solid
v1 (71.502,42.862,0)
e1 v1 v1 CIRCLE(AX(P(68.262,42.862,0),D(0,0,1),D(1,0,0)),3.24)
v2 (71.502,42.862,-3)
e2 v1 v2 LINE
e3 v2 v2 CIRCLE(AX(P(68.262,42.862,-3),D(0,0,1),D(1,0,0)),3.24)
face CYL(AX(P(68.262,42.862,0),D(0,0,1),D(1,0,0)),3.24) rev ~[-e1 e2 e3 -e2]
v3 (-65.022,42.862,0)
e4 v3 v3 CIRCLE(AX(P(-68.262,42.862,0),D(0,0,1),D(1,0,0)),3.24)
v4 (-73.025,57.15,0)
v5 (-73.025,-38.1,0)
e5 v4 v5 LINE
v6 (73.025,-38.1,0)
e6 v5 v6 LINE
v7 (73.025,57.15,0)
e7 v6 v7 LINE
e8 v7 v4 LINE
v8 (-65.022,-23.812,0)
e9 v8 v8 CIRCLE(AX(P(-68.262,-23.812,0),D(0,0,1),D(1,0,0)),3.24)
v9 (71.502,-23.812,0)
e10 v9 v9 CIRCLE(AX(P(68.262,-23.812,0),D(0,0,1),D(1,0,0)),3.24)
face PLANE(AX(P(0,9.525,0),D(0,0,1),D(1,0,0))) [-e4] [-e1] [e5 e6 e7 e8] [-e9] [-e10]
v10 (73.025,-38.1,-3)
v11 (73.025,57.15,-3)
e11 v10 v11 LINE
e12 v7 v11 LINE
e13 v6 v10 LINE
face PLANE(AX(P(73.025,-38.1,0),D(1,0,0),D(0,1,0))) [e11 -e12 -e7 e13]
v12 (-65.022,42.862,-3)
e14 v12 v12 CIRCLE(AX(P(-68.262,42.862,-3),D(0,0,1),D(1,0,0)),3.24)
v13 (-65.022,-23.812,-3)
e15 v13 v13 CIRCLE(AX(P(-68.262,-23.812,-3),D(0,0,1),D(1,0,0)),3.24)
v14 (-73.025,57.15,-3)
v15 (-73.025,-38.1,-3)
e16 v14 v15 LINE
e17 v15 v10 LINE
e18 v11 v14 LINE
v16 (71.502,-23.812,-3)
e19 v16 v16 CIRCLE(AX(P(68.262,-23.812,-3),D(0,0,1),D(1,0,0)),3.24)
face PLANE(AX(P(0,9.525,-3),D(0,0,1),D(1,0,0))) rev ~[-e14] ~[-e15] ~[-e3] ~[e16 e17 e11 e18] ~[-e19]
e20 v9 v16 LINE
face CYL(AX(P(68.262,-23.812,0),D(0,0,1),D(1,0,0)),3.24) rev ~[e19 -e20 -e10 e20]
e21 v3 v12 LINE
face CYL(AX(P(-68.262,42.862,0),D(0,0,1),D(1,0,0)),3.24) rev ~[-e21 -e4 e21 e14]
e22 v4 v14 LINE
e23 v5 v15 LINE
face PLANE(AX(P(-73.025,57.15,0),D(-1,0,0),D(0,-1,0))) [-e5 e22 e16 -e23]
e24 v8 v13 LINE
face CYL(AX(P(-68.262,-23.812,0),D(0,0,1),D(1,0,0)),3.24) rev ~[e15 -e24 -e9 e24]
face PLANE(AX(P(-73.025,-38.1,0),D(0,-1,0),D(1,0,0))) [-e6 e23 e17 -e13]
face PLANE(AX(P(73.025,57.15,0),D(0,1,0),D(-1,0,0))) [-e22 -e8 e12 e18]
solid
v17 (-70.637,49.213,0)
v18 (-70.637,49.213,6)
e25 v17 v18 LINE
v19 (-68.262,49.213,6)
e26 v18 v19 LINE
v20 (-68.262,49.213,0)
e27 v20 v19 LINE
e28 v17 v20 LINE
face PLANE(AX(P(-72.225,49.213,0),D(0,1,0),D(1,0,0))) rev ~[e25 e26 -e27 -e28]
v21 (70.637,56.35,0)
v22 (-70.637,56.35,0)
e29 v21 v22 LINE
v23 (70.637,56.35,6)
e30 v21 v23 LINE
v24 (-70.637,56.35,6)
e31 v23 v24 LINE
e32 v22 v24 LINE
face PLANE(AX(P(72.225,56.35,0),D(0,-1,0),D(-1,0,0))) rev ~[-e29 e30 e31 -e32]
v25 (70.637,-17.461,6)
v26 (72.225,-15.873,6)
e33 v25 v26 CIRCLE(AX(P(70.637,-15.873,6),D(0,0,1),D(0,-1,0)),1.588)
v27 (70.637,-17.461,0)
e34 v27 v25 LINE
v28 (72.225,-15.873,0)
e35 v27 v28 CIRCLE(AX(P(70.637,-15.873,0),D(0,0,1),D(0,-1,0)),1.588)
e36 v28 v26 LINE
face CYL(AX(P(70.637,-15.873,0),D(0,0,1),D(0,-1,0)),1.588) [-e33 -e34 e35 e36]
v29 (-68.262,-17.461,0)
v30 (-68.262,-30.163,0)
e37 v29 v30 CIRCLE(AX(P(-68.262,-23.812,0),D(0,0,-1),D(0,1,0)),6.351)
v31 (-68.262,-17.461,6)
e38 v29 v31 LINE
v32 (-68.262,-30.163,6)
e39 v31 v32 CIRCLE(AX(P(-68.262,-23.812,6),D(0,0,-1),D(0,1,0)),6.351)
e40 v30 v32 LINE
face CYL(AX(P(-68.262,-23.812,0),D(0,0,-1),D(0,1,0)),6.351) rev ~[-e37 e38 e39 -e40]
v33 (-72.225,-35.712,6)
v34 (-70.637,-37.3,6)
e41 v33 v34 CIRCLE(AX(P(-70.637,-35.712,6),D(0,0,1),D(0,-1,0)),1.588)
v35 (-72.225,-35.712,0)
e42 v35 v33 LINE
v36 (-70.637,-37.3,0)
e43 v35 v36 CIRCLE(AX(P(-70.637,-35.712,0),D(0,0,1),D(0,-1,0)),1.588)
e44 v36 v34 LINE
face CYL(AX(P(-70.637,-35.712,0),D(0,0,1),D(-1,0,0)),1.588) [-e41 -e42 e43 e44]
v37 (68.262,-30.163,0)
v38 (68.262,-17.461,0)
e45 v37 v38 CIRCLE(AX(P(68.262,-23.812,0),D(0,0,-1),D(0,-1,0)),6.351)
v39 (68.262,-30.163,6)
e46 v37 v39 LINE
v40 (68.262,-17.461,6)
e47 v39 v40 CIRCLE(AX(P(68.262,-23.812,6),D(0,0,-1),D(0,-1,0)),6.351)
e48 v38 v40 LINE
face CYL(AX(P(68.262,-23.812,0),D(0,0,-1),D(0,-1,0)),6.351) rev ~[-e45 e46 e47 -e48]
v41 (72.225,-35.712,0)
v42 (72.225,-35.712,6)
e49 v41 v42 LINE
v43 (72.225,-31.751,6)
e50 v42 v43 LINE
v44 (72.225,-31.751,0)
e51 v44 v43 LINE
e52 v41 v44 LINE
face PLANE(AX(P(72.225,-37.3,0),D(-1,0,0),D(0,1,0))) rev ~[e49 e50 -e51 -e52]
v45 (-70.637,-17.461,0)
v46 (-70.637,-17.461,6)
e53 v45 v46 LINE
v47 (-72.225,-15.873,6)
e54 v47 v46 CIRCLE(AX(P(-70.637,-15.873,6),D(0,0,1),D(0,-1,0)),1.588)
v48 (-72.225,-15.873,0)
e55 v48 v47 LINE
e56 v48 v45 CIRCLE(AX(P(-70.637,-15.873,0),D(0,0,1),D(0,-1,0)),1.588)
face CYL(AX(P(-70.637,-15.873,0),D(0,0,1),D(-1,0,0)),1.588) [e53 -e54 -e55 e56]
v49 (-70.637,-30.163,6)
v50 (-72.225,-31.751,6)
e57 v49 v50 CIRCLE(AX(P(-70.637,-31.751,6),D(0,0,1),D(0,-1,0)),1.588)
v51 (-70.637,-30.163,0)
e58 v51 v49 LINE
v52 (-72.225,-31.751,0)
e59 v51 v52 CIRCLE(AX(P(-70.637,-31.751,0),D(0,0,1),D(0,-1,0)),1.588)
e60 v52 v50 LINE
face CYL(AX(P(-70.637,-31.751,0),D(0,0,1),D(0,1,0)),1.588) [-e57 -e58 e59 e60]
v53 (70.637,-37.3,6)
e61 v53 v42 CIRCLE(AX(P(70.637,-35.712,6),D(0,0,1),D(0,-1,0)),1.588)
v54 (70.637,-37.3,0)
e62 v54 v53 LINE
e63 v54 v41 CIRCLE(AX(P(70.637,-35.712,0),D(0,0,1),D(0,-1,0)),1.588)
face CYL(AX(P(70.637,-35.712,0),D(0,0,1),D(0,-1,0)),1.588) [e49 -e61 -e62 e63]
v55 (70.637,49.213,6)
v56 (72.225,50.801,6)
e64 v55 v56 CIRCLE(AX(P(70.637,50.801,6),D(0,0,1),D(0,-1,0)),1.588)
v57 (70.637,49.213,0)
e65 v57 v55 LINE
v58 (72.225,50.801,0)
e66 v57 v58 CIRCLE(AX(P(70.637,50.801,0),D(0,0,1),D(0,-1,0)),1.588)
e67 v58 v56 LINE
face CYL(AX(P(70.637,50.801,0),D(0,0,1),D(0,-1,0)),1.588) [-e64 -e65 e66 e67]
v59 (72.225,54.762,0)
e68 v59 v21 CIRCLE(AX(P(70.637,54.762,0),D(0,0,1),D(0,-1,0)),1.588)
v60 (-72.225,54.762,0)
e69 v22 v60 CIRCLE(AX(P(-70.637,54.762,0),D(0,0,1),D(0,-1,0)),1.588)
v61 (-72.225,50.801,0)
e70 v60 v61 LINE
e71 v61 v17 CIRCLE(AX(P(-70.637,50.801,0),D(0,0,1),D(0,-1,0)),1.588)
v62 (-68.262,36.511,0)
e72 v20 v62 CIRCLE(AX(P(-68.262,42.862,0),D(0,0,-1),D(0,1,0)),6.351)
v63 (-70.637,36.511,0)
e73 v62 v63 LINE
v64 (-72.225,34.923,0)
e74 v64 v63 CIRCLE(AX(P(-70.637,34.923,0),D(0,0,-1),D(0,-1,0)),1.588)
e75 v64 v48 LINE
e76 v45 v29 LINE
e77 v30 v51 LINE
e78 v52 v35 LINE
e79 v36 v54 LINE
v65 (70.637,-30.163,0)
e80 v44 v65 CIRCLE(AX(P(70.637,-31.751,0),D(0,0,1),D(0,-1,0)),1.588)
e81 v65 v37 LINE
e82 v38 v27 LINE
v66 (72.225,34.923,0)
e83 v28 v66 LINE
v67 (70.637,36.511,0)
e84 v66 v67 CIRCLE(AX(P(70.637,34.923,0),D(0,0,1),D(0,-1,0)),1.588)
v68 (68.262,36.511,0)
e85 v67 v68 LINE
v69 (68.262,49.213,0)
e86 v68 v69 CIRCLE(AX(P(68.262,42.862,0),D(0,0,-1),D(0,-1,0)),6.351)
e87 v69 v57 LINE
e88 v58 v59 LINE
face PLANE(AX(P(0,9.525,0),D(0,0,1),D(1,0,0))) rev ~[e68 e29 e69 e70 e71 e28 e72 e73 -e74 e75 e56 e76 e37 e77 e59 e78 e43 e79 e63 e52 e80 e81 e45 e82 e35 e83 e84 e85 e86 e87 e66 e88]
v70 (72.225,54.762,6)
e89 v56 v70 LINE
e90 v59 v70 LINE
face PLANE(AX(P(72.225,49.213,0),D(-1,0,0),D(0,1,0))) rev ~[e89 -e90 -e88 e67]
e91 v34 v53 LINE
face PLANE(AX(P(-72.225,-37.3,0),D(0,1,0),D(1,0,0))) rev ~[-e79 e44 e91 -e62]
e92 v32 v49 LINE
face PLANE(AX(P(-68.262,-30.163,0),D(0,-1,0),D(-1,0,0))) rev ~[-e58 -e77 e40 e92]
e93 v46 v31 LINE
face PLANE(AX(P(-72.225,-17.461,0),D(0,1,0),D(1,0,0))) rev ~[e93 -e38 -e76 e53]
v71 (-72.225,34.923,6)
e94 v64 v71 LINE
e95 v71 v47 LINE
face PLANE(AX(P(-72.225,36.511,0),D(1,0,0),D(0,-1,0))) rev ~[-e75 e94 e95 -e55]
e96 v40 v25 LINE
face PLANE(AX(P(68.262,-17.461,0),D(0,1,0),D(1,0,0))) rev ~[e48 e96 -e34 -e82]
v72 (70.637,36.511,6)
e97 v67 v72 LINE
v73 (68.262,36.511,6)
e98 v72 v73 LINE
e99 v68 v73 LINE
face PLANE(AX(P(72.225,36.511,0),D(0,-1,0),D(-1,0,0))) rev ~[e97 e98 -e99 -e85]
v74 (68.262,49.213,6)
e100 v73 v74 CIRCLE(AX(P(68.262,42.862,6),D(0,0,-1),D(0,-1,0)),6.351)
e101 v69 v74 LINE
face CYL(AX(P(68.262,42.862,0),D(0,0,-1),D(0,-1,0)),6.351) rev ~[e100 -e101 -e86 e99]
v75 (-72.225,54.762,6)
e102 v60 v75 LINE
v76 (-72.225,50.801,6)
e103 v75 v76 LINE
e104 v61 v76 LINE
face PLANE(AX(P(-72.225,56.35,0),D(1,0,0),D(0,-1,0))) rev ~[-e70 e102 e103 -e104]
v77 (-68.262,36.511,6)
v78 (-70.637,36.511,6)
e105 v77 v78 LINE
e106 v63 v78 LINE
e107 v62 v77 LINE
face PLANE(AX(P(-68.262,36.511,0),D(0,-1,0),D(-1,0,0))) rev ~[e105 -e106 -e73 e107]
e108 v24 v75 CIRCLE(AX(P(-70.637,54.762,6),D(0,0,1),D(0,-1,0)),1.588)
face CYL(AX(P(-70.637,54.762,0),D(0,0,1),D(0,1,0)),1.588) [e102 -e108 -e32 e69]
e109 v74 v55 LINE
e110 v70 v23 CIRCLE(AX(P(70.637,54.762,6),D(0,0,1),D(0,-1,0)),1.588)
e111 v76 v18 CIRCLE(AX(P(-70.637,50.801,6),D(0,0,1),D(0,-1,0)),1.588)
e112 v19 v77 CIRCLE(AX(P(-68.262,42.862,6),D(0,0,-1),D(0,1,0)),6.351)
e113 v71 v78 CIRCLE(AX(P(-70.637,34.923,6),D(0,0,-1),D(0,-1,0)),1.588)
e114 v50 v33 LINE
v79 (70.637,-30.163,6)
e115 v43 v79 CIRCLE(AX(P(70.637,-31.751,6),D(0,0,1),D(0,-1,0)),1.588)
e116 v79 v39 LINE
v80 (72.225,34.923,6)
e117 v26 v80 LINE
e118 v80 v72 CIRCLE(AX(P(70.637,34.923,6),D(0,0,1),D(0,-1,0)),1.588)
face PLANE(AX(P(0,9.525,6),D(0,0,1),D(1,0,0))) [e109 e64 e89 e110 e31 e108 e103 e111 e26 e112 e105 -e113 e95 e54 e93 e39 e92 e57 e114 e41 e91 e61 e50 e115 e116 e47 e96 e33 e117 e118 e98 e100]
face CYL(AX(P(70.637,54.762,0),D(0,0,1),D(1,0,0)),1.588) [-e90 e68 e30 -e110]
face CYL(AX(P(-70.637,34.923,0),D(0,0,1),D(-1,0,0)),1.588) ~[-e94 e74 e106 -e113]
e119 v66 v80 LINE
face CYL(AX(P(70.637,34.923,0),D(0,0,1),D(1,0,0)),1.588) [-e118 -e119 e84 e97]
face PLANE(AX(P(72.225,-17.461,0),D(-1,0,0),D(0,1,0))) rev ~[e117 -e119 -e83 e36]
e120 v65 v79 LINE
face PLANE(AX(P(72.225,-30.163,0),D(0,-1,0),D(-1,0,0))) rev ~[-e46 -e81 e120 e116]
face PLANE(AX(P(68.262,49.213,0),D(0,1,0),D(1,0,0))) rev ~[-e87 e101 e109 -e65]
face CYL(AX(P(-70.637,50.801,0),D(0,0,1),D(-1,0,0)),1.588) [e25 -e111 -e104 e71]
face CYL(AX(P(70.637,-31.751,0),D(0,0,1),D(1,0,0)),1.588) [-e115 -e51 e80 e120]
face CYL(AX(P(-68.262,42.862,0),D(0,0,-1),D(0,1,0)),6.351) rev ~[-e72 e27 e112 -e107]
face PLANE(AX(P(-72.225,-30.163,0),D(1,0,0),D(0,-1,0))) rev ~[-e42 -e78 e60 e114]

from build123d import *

# Parameters (mm, degrees)
F0_R     = 3.24
F1_DEPTH = 3
F2_DEPTH = 6
F3_R     = 1.588


# Not quite as in the source:
# - a feature names something its author has since deleted; it is built from what else it names


with BuildPart() as f1:
    # F0 (on Top) → F1 (new body)
    with BuildSketch(Plane.XY):
        Polygon((0, 57.15), (-73.025, 57.15), (-73.025, 9.525), (-73.025, -38.1), (73.025, -38.1), (73.025, 57.15), align=None)
        with Locations((-68.262, -23.812)):
            Circle(F0_R, mode=Mode.SUBTRACT)
        with Locations((68.262, -23.812)):
            Circle(F0_R, mode=Mode.SUBTRACT)
        with Locations((-68.262, 42.862)):
            Circle(F0_R, mode=Mode.SUBTRACT)
        with BuildLine():
            Line((-72.225, -17.461), (-72.225, 9.525))
            Line((-72.225, 9.525), (-72.225, 36.511))
            Line((-72.225, 36.511), (-68.262, 36.511))
            ThreePointArc((-68.262, 36.511), (-61.911, 42.862), (-68.262, 49.213))
            Line((-68.262, 49.213), (-72.225, 49.213))
            Line((-72.225, 49.213), (-72.225, 56.35))
            Line((-72.225, 56.35), (72.225, 56.35))
            Line((72.225, 56.35), (72.225, 49.213))
            Line((72.225, 49.213), (68.262, 49.213))
            ThreePointArc((68.262, 49.213), (61.911, 42.862), (68.262, 36.511))
            Line((68.262, 36.511), (72.225, 36.511))
            Line((72.225, 36.511), (72.225, -17.461))
            Line((72.225, -17.461), (68.262, -17.461))
            ThreePointArc((68.262, -17.461), (61.911, -23.812), (68.262, -30.163))
            Line((68.262, -30.163), (72.225, -30.163))
            Line((72.225, -30.163), (72.225, -37.3))
            Line((72.225, -37.3), (-72.225, -37.3))
            Line((-72.225, -37.3), (-72.225, -30.163))
            Line((-72.225, -30.163), (-68.262, -30.163))
            ThreePointArc((-68.262, -30.163), (-61.911, -23.812), (-68.262, -17.461))
            Line((-68.262, -17.461), (-72.225, -17.461))
        make_face(mode=Mode.SUBTRACT)
        with Locations((68.262, 42.862)):
            Circle(F0_R, mode=Mode.SUBTRACT)
        with BuildLine():
            Line((-72.225, 36.511), (-72.225, 9.525))
            Line((-72.225, 9.525), (-72.225, -17.461))
            Line((-72.225, -17.461), (-68.262, -17.461))
            ThreePointArc((-68.262, -17.461), (-61.911, -23.812), (-68.262, -30.163))
            Line((-68.262, -30.163), (-72.225, -30.163))
            Line((-72.225, -30.163), (-72.225, -37.3))
            Line((-72.225, -37.3), (72.225, -37.3))
            Line((72.225, -37.3), (72.225, -30.163))
            Line((72.225, -30.163), (68.262, -30.163))
            ThreePointArc((68.262, -30.163), (61.911, -23.812), (68.262, -17.461))
            Line((68.262, -17.461), (72.225, -17.461))
            Line((72.225, -17.461), (72.225, 36.511))
            Line((72.225, 36.511), (68.262, 36.511))
            ThreePointArc((68.262, 36.511), (61.911, 42.862), (68.262, 49.213))
            Line((68.262, 49.213), (72.225, 49.213))
            Line((72.225, 49.213), (72.225, 56.35))
            Line((72.225, 56.35), (-72.225, 56.35))
            Line((-72.225, 56.35), (-72.225, 49.213))
            Line((-72.225, 49.213), (-68.262, 49.213))
            ThreePointArc((-68.262, 49.213), (-61.911, 42.862), (-68.262, 36.511))
            Line((-68.262, 36.511), (-72.225, 36.511))
        make_face()
    extrude(amount=-F1_DEPTH)


with BuildPart() as f2:
    # F0 (on Top) → F2 (new body)
    with BuildSketch(Plane.XY):
        with BuildLine():
            Line((-72.225, 36.511), (-72.225, 9.525))
            Line((-72.225, 9.525), (-72.225, -17.461))
            Line((-72.225, -17.461), (-68.262, -17.461))
            ThreePointArc((-68.262, -17.461), (-61.911, -23.812), (-68.262, -30.163))
            Line((-68.262, -30.163), (-72.225, -30.163))
            Line((-72.225, -30.163), (-72.225, -37.3))
            Line((-72.225, -37.3), (72.225, -37.3))
            Line((72.225, -37.3), (72.225, -30.163))
            Line((72.225, -30.163), (68.262, -30.163))
            ThreePointArc((68.262, -30.163), (61.911, -23.812), (68.262, -17.461))
            Line((68.262, -17.461), (72.225, -17.461))
            Line((72.225, -17.461), (72.225, 36.511))
            Line((72.225, 36.511), (68.262, 36.511))
            ThreePointArc((68.262, 36.511), (61.911, 42.862), (68.262, 49.213))
            Line((68.262, 49.213), (72.225, 49.213))
            Line((72.225, 49.213), (72.225, 56.35))
            Line((72.225, 56.35), (-72.225, 56.35))
            Line((-72.225, 56.35), (-72.225, 49.213))
            Line((-72.225, 49.213), (-68.262, 49.213))
            ThreePointArc((-68.262, 49.213), (-61.911, 42.862), (-68.262, 36.511))
            Line((-68.262, 36.511), (-72.225, 36.511))
        make_face()
    extrude(amount=F2_DEPTH)

    # F3
    f3_edges = [f2.edges().sort_by_distance(p)[0] for p in [
        (-72.225, 56.35, 3),
        (-72.225, -37.3, 3),
        (72.225, -37.3, 3),
        (72.225, 56.35, 3),
        (-72.225, 36.511, 3),
        (-72.225, -17.461, 3),
        (-72.225, 49.213, 3),
        (72.225, 49.213, 3),
        (72.225, 36.511, 3),
        (72.225, -17.461, 3),
        (72.225, -30.163, 3),
        (-72.225, -30.163, 3),
    ]]
    fillet(f3_edges, radius=F3_R)


solid = Compound([f1.part, f2.part])
